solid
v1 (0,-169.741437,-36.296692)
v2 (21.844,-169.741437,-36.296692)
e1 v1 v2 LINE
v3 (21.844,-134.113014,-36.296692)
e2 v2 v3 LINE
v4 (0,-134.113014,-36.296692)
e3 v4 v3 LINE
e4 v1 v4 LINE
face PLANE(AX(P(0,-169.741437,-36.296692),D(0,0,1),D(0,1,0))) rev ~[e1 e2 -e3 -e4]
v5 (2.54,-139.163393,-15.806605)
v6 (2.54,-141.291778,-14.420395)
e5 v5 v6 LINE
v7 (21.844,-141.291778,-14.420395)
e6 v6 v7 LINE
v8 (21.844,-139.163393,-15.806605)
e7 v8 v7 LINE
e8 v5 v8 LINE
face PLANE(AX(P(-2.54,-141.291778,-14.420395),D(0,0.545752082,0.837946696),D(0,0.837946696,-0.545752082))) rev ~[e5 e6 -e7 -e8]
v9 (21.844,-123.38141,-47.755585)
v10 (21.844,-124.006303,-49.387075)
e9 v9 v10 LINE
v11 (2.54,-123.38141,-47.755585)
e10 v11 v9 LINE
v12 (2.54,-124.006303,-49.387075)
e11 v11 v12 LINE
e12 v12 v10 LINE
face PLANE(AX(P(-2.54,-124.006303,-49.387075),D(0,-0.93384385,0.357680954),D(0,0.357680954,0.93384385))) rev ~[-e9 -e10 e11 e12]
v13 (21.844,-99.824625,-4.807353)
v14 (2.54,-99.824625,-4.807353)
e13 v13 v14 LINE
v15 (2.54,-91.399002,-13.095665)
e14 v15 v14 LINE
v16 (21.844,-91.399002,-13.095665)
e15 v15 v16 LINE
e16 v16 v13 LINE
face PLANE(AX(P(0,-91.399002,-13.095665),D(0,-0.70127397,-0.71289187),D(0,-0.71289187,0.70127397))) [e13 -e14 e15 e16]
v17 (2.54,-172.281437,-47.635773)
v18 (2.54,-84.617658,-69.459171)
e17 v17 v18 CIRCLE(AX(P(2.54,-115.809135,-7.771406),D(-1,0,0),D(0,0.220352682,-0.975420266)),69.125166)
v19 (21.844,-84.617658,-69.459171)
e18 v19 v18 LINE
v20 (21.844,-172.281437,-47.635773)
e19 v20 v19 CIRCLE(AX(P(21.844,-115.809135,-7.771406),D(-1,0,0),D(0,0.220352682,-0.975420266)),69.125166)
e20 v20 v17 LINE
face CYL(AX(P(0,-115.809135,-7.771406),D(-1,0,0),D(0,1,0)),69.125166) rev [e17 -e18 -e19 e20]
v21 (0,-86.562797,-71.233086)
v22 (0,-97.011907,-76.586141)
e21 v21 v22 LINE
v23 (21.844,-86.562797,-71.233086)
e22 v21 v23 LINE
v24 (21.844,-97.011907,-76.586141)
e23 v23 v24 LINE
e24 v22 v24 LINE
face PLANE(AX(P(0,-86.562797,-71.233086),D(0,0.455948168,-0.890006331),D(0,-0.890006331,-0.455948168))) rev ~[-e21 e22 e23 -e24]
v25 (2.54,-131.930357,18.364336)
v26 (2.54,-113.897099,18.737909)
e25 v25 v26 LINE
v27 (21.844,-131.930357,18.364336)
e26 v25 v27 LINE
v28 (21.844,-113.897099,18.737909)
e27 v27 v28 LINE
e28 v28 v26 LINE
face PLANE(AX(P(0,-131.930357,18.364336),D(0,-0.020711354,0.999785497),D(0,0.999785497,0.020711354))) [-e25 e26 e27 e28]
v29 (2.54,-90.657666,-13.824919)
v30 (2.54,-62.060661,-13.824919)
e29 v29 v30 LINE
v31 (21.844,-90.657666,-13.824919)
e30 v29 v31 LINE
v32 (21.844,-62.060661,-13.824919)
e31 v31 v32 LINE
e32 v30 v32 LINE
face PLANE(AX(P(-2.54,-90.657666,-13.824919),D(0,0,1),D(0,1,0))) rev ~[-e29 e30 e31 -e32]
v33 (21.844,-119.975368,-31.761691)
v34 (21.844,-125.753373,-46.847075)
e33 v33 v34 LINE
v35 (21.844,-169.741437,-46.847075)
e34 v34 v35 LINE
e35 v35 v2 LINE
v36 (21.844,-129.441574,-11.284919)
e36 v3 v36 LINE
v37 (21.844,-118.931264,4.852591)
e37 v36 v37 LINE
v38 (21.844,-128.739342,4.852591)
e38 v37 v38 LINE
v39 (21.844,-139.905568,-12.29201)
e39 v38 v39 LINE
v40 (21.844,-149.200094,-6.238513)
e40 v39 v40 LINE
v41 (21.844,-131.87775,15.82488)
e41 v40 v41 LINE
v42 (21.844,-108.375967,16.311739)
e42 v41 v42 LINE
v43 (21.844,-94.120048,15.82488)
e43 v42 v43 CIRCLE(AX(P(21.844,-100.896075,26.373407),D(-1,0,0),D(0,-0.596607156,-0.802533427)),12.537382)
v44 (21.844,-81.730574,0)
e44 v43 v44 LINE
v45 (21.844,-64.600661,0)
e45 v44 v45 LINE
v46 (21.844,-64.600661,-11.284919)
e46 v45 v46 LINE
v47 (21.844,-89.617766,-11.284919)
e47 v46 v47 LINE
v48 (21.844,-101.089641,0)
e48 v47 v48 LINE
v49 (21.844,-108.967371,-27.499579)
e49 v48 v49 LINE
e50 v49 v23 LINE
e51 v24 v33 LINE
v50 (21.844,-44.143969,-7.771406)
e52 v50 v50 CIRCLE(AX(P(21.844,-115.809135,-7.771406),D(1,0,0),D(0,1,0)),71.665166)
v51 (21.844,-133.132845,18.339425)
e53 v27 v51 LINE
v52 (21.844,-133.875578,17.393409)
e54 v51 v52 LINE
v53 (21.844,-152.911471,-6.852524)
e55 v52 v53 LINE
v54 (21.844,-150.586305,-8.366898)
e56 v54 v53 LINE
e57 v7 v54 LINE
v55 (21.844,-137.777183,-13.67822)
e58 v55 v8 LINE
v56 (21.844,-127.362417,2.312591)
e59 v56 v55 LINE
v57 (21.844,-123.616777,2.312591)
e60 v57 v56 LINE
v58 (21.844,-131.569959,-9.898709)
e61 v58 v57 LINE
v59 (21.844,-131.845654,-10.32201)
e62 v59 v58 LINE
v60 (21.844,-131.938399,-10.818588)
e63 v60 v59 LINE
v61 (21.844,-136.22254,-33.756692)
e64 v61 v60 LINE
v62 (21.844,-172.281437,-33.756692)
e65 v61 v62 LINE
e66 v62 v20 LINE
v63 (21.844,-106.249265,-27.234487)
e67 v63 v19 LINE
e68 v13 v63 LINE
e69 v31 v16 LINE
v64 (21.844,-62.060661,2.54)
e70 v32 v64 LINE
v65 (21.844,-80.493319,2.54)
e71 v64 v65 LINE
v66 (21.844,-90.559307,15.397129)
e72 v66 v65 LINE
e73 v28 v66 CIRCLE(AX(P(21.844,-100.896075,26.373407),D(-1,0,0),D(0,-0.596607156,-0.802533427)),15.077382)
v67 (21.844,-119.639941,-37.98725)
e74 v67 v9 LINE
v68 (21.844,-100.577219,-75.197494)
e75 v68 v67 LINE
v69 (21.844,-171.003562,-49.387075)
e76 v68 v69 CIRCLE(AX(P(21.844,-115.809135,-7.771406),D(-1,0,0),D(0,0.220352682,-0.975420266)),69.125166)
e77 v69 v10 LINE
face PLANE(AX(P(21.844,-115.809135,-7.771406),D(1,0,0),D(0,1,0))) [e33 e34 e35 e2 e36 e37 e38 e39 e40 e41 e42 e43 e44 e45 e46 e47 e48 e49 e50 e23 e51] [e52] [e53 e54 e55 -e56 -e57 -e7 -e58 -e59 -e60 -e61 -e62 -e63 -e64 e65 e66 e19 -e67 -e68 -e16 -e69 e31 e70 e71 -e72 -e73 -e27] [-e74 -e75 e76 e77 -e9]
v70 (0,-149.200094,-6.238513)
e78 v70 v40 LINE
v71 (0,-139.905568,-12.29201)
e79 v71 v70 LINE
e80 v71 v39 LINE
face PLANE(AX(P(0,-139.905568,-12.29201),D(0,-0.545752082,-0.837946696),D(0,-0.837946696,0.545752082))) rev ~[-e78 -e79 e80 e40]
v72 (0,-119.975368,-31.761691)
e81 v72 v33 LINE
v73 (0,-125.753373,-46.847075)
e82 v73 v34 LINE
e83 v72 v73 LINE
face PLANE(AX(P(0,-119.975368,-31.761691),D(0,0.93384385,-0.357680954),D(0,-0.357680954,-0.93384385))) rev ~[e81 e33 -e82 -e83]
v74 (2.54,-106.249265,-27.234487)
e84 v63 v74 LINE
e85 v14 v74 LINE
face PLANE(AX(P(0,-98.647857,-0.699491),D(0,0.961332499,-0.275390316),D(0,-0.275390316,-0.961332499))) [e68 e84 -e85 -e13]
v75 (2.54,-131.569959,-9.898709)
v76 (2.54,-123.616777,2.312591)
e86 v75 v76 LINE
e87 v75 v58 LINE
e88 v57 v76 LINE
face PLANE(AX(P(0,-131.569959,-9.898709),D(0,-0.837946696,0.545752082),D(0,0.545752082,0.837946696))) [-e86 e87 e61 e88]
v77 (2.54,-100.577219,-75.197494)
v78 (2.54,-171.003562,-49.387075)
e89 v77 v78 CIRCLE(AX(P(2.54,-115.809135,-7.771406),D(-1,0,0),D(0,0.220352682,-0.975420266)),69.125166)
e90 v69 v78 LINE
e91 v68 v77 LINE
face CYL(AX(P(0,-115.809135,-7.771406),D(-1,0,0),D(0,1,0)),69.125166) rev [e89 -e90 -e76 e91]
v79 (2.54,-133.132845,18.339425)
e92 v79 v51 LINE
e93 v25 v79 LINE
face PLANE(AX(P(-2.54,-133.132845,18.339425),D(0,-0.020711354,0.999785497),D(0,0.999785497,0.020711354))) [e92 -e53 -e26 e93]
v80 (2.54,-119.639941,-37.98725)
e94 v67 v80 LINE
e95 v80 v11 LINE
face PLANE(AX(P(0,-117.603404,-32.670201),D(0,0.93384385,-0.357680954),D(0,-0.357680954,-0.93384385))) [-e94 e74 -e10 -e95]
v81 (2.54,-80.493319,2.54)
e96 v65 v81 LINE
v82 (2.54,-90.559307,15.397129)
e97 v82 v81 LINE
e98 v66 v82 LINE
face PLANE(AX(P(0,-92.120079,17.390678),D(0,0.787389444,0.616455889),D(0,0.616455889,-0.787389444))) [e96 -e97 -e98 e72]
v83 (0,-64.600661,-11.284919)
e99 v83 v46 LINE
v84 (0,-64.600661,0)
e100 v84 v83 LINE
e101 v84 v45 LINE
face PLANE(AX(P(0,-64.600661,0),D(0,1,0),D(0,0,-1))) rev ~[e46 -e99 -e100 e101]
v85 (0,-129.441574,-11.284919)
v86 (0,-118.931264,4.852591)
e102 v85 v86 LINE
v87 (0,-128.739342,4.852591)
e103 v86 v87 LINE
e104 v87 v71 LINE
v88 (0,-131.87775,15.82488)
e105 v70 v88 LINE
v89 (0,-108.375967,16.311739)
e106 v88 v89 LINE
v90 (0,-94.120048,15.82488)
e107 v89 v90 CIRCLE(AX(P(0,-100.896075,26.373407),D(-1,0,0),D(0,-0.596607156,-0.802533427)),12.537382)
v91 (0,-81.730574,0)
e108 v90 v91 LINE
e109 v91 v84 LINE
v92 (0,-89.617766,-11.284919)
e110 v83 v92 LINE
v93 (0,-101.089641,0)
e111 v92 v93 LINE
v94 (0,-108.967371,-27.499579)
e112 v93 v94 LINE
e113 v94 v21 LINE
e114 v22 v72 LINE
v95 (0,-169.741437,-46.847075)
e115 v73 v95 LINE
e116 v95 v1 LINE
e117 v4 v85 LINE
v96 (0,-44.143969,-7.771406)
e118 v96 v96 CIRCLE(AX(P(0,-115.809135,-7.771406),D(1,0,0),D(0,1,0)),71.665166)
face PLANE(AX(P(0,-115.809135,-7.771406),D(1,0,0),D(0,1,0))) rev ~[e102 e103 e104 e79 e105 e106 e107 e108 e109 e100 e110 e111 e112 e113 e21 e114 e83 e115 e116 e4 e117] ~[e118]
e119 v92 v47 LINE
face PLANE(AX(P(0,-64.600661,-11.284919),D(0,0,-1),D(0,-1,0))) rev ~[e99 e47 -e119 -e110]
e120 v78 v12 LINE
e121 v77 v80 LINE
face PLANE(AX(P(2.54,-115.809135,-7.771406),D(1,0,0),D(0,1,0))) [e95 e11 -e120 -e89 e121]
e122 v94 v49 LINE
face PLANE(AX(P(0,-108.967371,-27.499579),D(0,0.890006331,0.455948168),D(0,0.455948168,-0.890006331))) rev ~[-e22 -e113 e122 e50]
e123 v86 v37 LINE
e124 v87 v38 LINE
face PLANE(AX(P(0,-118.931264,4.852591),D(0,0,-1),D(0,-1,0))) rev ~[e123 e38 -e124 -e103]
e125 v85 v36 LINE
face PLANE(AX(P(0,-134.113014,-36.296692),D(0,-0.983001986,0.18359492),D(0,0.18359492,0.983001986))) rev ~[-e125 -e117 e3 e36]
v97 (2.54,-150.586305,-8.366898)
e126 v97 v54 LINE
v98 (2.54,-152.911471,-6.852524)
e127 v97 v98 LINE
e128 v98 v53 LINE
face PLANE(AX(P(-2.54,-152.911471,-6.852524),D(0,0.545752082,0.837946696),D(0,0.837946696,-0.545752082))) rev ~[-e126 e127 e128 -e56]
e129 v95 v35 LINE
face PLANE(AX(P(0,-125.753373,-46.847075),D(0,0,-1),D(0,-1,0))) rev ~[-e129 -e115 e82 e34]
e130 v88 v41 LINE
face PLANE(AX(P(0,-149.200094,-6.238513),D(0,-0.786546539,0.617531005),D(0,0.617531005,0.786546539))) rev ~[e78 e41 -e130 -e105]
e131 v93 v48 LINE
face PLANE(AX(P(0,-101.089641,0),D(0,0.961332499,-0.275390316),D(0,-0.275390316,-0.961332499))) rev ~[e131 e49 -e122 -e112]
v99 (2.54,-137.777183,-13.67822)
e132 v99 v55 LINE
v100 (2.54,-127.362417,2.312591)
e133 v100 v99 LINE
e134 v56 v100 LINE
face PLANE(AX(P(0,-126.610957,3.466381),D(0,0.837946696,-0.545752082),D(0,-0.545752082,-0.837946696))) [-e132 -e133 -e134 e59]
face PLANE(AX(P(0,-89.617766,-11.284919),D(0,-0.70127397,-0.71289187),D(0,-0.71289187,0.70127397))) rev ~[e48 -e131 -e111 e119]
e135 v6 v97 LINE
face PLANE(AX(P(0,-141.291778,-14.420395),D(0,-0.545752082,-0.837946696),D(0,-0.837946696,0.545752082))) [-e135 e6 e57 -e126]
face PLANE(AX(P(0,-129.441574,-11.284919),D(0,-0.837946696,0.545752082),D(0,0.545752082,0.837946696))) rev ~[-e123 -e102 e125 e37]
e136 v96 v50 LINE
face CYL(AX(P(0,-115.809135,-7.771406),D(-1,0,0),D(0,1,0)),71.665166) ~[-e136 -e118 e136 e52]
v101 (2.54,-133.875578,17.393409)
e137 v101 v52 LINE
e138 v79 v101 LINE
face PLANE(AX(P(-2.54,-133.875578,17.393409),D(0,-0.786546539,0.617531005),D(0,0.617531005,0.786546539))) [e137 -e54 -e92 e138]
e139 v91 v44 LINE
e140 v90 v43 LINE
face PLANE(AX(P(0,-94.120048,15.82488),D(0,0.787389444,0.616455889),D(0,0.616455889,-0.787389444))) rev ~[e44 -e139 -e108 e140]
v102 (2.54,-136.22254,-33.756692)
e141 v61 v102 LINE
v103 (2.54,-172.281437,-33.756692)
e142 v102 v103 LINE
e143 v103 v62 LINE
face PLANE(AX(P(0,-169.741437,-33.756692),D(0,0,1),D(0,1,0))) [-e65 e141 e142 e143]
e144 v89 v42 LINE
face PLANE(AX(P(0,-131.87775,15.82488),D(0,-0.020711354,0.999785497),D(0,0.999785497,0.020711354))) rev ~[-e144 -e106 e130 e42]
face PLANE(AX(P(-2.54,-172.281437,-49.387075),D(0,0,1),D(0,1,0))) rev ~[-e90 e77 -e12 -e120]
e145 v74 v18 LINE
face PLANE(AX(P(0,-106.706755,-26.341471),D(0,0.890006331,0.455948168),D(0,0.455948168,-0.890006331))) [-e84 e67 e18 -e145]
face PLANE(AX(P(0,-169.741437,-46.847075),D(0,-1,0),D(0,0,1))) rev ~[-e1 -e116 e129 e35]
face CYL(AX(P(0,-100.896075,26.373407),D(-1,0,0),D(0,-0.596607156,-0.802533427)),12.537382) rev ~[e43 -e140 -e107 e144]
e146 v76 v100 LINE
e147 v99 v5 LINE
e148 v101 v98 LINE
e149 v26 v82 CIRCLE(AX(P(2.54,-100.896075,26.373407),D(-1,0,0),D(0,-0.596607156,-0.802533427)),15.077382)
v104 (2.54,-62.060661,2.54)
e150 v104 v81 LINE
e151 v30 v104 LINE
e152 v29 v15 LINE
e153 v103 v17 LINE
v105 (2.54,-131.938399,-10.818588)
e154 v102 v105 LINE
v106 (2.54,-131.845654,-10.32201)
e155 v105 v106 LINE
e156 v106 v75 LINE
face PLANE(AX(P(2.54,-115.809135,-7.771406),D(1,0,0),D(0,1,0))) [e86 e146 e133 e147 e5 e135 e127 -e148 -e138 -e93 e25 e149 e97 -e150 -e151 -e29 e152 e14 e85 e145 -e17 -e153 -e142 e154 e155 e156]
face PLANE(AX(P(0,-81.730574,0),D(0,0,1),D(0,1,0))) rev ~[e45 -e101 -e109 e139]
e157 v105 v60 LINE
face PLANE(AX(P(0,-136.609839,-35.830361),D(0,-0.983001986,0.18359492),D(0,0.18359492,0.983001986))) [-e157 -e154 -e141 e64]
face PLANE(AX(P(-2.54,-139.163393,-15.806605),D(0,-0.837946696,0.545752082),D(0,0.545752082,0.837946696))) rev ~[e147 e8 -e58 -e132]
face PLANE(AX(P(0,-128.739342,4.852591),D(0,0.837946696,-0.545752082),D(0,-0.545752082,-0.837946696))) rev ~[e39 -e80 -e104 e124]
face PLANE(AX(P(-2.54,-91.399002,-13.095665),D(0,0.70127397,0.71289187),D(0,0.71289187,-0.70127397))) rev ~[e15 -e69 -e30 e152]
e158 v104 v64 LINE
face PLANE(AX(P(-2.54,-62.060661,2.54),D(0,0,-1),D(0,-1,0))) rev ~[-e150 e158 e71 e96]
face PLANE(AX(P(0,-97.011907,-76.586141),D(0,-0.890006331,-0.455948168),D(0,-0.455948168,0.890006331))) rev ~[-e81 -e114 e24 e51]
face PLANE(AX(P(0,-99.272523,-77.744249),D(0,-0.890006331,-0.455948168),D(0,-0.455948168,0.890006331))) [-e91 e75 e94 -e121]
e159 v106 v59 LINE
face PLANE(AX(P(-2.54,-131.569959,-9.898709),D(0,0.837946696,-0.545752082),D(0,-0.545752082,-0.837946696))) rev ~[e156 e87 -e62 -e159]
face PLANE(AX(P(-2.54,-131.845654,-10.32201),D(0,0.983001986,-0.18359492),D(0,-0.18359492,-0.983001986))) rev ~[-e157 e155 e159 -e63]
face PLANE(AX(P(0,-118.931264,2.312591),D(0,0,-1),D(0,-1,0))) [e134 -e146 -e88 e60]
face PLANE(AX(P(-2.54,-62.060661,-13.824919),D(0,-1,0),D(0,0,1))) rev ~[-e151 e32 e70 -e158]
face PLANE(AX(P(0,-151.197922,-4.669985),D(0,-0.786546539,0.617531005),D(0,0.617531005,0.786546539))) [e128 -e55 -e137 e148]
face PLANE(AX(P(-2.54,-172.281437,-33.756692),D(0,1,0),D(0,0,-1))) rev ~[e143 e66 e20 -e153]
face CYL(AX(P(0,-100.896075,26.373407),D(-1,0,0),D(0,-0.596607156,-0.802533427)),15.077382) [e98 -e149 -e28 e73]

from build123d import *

# Parameters (mm, degrees)
F0_R        = 71.6651662247
F1_DEPTH    = 21.844
F2_T        = 2.54
F2_T3_DEPTH = 26.924


# Not quite as in the source:
# - a shell that OpenCascade refuses in one call is made with other operations: the cavity is built on its own and cut out
# - a feature names something its author has since deleted; it is built from what else it names


with BuildPart() as f1:
    # F0 (on Right) → F1 (new body)
    with BuildSketch(Plane.YZ):
        with Locations((-115.809135139, -7.7714063227)):
            Circle(F0_R)
        with BuildLine():
            ThreePointArc((-108.3759665489, 16.3117386401), (-100.4681563218, 38.9034837812), (-94.1200479865, 15.824880451))
            Line((-94.1200479865, 15.824880451), (-81.7305743694, 0))
            Line((-81.7305743694, 0), (-64.600661397, 0))
            Line((-64.600661397, 0), (-64.600661397, -11.2849194556))
            Line((-64.600661397, -11.2849194556), (-89.6177664399, -11.2849194556))
            Line((-89.6177664399, -11.2849194556), (-101.0896414518, 0))
            Line((-101.0896414518, 0), (-108.967371285, -27.4995788932))
            Line((-108.967371285, -27.4995788932), (-86.5627974272, -71.233086288))
            Line((-86.5627974272, -71.233086288), (-97.011906829, -76.5861406686))
            Line((-97.011906829, -76.5861406686), (-119.9753677787, -31.7616911776))
            Line((-119.9753677787, -31.7616911776), (-125.7533729076, -46.8470752239))
            Line((-125.7533729076, -46.8470752239), (-152.9145538807, -46.8470752239))
            Line((-152.9145538807, -46.8470752239), (-156.1464071274, -46.8470752239))
            Line((-156.1464071274, -46.8470752239), (-169.7414368391, -46.8470752239))
            Line((-169.7414368391, -46.8470752239), (-169.7414368391, -36.2966917455))
            Line((-169.7414368391, -36.2966917455), (-156.1464071274, -36.2966917455))
            Line((-156.1464071274, -36.2966917455), (-134.1130137444, -36.2966917455))
            Line((-134.1130137444, -36.2966917455), (-129.4415742159, -11.2849194556))
            Line((-129.4415742159, -11.2849194556), (-118.9312636852, 4.8525910825))
            Line((-118.9312636852, 4.8525910825), (-128.7393420935, 4.8525910825))
            Line((-128.7393420935, 4.8525910825), (-139.9055675141, -12.2920099139))
            Line((-139.9055675141, -12.2920099139), (-149.2000942902, -6.2385134702))
            Line((-149.2000942902, -6.2385134702), (-131.8777501583, 15.824880451))
            Line((-131.8777501583, 15.824880451), (-108.3759665489, 16.3117386401))
        make_face(mode=Mode.SUBTRACT)
    extrude(amount=F1_DEPTH)

    # F2: shell of thickness 2.54, made by hand


with BuildPart() as f2_core1:
    # F2_t2: copy of F1
    add(f1.part)

    # the walls: a layer under each face that stays
    f2_faces = [f2_core1.faces().sort_by_distance(p)[0] for p in [
        (10.922, -187.4743013637, -7.7714063227),
        (10.922, -140.5389222243, 4.7931834904),
        (10.922, -144.5528309022, -9.2652616921),
        (10.922, -134.3224548038, -3.7197094157),
        (10.922, -123.8353028893, 4.8525910825),
        (10.922, -124.1864189506, -3.2161641866),
        (10.922, -131.7772939801, -23.7908056006),
        (10.922, -151.9272252917, -36.2966917455),
        (10.922, -169.7414368391, -41.5718834847),
        (10.922, -147.7474048734, -46.8470752239),
        (10.922, -122.8643703432, -39.3043832007),
        (10.922, -108.4936373039, -54.1739159231),
        (10.922, -91.7873521281, -73.9096134783),
        (10.922, -97.7650843561, -49.3663325906),
        (10.922, -105.0285063684, -13.7497894466),
        (10.922, -95.3537039459, -5.6424597278),
        (10.922, -77.1092139184, -11.2849194556),
        (10.922, -64.600661397, -5.6424597278),
        (10.922, -73.1656178832, 0),
        (10.922, -87.925311178, 7.9124402255),
        (10.922, -100.4681563218, 38.9034837812),
        (10.922, -120.1268583536, 16.0683095455),
        (0, -163.5859126221, -55.5481838059),
    ]]
    thicken(f2_faces, amount=-F2_T, mode=Mode.SUBTRACT)

    # F2_s4 → F2_t3 (cut)
    with BuildSketch(Plane.YZ.offset(-2.54)):
        Polygon((-149.1662539052, -6.2329149117), (-151.197922499, -4.6699847175), (-152.9114712381, -6.8525242483), (-150.5863045792, -8.3668980771), align=None)
        Polygon((-131.8572458078, 15.7838006118), (-133.8755783671, 17.3934092037), (-133.1328452619, 18.3394251098), (-131.9303569971, 18.3643356131), align=None)
        Polygon((-139.9129892573, -12.256863965), (-141.2917778031, -14.4203945208), (-139.1633931962, -15.8066048098), (-137.7771829073, -13.6782202029), align=None)
        Polygon((-129.3953221194, -11.3034448695), (-131.5699588227, -9.8987091667), (-131.8456535688, -10.3220103485), (-131.9383992614, -10.8185883585), align=None)
        Polygon((-169.7160368391, -36.3220917455), (-169.7414368391, -33.7566917455), (-172.2814368391, -33.7566917455), (-172.2814368391, -36.2966917455), align=None)
        Polygon((-169.7160368391, -46.8216752239), (-172.2814368391, -46.8470752239), (-172.2814368391, -49.3870752239), (-169.7414368391, -49.3870752239), align=None)
        Polygon((-125.7770925414, -46.8125901277), (-125.7533729076, -49.3870752239), (-124.0063031182, -49.3870752239), (-123.3814095297, -47.7555848463), align=None)
        Polygon((-97.0008817516, -76.5519534244), (-99.2725229084, -77.7442490147), (-98.1144145624, -80.0048650942), (-95.8537984829, -78.8467567481), align=None)
        Polygon((-86.5969846714, -71.2220612106), (-85.4046890811, -73.4937023674), (-83.1440730016, -72.3355940214), (-84.3021813477, -70.0749779419), align=None)
        Polygon((-89.5999540811, -11.2414120021), (-91.3990023244, -13.095664806), (-90.6576662231, -13.8249194556), (-89.6177664399, -13.8249194556), align=None)
        Polygon((-64.626061397, -11.2595194556), (-64.600661397, -13.8249194556), (-62.060661397, -13.8249194556), (-62.060661397, -11.2849194556), align=None)
        Polygon((-64.626061397, -0.0254), (-62.060661397, 0), (-62.060661397, 2.54), (-64.600661397, 2.54), align=None)
    extrude(amount=F2_T3_DEPTH, mode=Mode.SUBTRACT)


with BuildPart() as f1_1:
    add(f1.part)

    # what is left inside the walls is the cavity
    f2_cavity = [f2_core1.part.solids().sort_by_distance(p)[0] for p in [
        (15.409333, -139.586841, -72.651283),
        (21.8186, -150.371718, 17.74945),
    ]]
    add(f2_cavity, mode=Mode.SUBTRACT)


solid = f1_1.part
